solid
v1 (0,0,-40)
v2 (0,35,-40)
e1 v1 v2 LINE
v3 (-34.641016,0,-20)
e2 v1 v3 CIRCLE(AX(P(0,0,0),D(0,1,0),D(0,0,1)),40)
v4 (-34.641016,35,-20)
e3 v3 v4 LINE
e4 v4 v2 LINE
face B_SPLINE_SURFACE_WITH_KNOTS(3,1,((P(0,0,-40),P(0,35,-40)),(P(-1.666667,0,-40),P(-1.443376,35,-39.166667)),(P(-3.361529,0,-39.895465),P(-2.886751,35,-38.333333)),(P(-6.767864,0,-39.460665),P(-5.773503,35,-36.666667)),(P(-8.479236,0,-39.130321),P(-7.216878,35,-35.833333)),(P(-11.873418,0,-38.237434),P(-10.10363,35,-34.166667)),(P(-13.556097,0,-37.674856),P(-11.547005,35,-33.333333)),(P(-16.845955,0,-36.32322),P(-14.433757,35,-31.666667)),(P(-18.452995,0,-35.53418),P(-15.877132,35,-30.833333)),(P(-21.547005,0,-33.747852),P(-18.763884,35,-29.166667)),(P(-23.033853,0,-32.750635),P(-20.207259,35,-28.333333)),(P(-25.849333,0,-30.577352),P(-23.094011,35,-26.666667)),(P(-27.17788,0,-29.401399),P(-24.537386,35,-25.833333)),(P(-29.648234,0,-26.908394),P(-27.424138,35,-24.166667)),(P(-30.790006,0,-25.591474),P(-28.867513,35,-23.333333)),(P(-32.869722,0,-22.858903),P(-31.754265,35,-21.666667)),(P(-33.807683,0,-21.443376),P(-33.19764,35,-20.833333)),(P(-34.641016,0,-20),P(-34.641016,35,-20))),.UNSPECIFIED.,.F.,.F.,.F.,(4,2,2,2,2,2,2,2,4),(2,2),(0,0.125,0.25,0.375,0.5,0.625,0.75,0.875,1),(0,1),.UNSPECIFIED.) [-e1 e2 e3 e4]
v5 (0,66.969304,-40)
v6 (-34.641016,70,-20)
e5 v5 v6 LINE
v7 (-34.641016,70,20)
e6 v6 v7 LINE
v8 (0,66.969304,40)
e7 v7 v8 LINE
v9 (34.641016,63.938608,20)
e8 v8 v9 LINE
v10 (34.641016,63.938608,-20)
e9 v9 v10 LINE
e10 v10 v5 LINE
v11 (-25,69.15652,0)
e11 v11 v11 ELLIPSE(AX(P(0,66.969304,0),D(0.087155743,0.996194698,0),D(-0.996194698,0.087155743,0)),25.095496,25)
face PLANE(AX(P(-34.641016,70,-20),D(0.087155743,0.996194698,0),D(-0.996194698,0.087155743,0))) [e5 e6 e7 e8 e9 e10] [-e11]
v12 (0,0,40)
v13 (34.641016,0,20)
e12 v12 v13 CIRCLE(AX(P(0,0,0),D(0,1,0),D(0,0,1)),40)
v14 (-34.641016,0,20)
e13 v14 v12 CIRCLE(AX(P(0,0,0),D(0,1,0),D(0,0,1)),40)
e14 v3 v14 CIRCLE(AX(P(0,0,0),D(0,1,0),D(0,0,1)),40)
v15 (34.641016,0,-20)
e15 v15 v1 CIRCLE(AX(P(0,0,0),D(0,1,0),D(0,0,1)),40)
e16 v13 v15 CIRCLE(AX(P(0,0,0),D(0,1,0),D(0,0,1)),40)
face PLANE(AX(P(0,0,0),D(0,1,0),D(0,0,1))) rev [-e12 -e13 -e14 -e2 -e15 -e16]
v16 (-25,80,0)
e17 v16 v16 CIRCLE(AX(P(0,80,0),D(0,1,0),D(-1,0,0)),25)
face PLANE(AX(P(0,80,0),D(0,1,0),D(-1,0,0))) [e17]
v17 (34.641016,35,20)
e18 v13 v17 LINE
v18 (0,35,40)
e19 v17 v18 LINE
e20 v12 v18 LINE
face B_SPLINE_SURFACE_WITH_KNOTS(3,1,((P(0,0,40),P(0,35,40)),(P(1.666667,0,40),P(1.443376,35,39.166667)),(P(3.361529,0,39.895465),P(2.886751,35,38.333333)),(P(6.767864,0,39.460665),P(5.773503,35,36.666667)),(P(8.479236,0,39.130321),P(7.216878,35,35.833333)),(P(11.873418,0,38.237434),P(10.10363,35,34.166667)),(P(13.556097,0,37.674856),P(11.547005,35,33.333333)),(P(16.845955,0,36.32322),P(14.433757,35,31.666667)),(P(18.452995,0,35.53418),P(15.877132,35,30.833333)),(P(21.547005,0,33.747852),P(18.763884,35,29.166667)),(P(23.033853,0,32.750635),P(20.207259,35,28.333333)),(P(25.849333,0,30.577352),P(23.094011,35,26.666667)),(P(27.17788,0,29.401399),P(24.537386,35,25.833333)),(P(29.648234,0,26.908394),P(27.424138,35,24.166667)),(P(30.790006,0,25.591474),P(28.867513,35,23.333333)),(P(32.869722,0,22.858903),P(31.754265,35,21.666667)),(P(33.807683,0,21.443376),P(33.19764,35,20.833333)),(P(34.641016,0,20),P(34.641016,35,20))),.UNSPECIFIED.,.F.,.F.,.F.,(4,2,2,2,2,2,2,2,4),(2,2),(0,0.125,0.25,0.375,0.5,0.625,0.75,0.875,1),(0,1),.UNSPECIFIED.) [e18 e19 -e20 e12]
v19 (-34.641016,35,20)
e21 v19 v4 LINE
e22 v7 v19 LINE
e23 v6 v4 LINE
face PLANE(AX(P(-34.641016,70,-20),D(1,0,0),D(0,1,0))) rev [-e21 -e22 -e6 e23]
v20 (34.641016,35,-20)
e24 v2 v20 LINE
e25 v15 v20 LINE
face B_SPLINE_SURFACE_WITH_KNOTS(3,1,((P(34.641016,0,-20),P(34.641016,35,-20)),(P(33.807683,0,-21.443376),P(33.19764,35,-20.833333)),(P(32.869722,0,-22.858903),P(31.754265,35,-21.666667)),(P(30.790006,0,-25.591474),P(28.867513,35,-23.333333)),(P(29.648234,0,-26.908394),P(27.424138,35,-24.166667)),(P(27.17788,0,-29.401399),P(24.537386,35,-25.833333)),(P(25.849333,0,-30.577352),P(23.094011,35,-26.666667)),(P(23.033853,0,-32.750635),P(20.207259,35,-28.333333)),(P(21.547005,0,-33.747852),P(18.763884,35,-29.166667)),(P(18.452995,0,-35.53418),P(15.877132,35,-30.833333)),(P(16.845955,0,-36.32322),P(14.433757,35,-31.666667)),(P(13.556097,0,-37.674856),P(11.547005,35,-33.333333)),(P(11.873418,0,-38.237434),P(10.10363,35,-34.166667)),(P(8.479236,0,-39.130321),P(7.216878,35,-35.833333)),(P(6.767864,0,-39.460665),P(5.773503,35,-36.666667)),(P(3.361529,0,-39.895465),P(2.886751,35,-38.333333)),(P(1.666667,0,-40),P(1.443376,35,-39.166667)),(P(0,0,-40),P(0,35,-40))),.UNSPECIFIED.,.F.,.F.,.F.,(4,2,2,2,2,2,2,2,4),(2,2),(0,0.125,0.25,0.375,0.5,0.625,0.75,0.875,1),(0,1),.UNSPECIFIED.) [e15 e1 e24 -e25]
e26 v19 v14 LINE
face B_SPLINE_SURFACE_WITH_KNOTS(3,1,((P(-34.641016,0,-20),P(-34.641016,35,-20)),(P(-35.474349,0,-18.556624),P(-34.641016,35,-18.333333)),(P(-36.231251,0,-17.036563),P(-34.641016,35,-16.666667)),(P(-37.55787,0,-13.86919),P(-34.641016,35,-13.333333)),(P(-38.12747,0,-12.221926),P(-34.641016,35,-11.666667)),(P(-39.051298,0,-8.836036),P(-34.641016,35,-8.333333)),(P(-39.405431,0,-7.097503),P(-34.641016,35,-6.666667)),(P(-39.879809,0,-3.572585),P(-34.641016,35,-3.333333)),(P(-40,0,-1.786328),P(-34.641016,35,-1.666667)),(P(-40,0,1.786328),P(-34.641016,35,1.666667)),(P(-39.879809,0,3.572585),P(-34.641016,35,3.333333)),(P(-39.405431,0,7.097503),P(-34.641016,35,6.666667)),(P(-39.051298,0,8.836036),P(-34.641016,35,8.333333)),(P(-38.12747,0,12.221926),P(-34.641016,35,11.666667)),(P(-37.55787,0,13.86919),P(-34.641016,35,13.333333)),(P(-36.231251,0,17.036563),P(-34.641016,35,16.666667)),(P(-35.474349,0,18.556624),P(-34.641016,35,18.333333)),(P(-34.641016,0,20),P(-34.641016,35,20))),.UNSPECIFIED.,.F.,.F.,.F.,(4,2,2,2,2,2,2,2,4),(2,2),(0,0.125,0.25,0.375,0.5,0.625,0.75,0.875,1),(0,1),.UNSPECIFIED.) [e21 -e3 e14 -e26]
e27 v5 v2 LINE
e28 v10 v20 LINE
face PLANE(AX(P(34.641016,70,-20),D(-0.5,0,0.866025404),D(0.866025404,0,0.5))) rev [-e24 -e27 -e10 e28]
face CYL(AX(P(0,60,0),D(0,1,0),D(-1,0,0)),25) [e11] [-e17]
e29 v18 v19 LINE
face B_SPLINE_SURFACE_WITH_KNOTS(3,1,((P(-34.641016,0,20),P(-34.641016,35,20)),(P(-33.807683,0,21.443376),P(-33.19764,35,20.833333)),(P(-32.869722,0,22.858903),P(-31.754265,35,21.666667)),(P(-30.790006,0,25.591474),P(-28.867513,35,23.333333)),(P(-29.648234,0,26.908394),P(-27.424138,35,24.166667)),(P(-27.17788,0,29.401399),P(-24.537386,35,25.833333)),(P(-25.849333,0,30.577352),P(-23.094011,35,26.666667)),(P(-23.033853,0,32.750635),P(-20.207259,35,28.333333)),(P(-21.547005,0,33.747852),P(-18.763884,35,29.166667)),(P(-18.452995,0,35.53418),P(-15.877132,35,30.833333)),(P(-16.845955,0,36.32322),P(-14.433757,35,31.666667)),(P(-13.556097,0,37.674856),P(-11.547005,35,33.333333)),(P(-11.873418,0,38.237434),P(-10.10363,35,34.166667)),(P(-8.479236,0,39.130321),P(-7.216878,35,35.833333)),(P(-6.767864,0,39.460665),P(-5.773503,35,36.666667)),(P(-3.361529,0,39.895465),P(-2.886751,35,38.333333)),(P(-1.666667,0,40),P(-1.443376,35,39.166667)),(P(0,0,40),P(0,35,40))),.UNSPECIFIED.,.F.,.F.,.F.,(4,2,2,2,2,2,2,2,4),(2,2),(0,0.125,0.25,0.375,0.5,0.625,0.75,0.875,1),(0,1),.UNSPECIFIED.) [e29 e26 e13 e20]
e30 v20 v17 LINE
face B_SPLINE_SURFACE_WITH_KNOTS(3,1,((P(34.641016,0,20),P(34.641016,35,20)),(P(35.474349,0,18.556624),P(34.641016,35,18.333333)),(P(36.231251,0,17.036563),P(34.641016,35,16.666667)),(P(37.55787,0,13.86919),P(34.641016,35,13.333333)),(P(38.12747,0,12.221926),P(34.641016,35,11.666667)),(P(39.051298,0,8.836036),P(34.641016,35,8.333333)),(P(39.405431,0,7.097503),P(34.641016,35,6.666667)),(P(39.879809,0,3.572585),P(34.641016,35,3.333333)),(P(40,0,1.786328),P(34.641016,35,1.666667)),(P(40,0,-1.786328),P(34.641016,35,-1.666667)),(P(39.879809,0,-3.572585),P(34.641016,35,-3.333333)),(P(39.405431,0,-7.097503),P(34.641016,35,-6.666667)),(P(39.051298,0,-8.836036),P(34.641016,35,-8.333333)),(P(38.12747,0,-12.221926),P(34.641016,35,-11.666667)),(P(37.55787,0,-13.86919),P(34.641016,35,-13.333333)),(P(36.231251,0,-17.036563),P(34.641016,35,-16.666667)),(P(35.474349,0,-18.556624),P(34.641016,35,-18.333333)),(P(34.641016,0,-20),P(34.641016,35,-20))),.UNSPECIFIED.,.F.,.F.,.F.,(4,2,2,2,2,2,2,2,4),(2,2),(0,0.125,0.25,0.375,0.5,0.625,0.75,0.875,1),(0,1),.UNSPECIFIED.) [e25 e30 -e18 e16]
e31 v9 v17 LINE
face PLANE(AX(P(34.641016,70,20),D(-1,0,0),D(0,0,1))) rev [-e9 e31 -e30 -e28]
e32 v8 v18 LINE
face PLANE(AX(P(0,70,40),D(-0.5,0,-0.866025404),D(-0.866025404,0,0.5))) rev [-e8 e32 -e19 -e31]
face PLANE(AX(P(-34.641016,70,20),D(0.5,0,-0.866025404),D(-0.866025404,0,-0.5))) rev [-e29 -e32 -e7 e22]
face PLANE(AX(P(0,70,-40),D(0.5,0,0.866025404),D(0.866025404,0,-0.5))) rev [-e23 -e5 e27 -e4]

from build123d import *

# Parameters (mm, degrees)
BOSS_EXTRUDE1_DEPTH      = 35
DRAFT3_START             = 66.714465374
DRAFT3_OUTLINE_W         = 72
DRAFT3_OUTLINE_H         = 84
DRAFT3_DEPTH             = 6.038326985
BOSS_EXTRUDE3_DEPTH      = 10
BOSS_EXTRUDE3_DEPTH_BACK = 10
SKETCH8_R                = 25


# Read off the part's stored shape, not the designer's step: Draft3
with BuildPart() as part:
    # Sketch3 for Loft2 → Loft2 section 0
    with BuildSketch(Plane(origin=(0, 0, 0), x_dir=(1, 0, 0), z_dir=(0, 1, 0))):
        with BuildLine():
            # circular arc as an exact rational Bezier (weights 1, cos(half-angle), 1)
            Bezier((-34.641016151, 20), (-23.094010767, 39.999999999), (0, 40), weights=[1, 0.866025404, 1])
            Bezier((0, 40), (23.094010767, 39.999999999), (34.641016151, 20), weights=[1, 0.866025404, 1])
            Bezier((34.641016151, 20), (46.188021536, 0), (34.641016151, -20), weights=[1, 0.866025404, 1])
            Bezier((34.641016151, -20), (23.094010767, -39.999999999), (0, -40), weights=[1, 0.866025404, 1])
            Bezier((0, -40), (-23.094010767, -39.999999999), (-34.641016151, -20), weights=[1, 0.866025404, 1])
            Bezier((-34.641016151, -20), (-46.188021536, 0), (-34.641016151, 20), weights=[1, 0.866025404, 1])
        make_face()
    # Sketch4 → Loft2 section 1
    with BuildSketch(Plane(origin=(0, 35, 0), x_dir=(-1, 0, 0), z_dir=(0, -1, 0))):
        with BuildLine():
            Line((34.641016151, 20), (0, 40))
            Line((0, 40), (-34.641016151, 20))
            Line((-34.641016151, 20), (-34.641016151, -20))
            Line((-34.641016151, -20), (0, -40))
            Line((0, -40), (34.641016151, -20))
            Line((34.641016151, -20), (34.641016151, 20))
        make_face()
    loft()

    # Sketch7 → Boss-Extrude1 (add)
    with BuildSketch(Plane(origin=(0, 35, 0), x_dir=(1, 0, 0), z_dir=(0, 1, 0))):
        Polygon((-34.641016151, 20), (-34.641016151, -20), (0, -40), (34.641016151, -20), (34.641016151, 20), (0, 40), align=None)
    extrude(amount=BOSS_EXTRUDE1_DEPTH)

    # Draft3 outline → Draft3 (cut)
    with BuildSketch(Plane(origin=(0, 0, 0), x_dir=(0.9961946980917452, -0.08715574274766182, 0), z_dir=(0.08715574274766182, 0.9961946980917452, 0)).offset(DRAFT3_START)):
        with Locations((-6, 0)):
            Rectangle(DRAFT3_OUTLINE_W, DRAFT3_OUTLINE_H)
    extrude(amount=DRAFT3_DEPTH, mode=Mode.SUBTRACT)

    # Sketch8 → Boss-Extrude3 (add, two sides: drawn at the far end of the back side and taken through both)
    with BuildSketch(Plane(origin=(0, 70, 0), x_dir=(1, 0, 0), z_dir=(0, 1, 0)).offset(-BOSS_EXTRUDE3_DEPTH_BACK)):
        with Locations(Location((0, 0, 0), (0, 0, 180))):
            Circle(SKETCH8_R)
    extrude(amount=BOSS_EXTRUDE3_DEPTH + BOSS_EXTRUDE3_DEPTH_BACK)


solid = part.part
